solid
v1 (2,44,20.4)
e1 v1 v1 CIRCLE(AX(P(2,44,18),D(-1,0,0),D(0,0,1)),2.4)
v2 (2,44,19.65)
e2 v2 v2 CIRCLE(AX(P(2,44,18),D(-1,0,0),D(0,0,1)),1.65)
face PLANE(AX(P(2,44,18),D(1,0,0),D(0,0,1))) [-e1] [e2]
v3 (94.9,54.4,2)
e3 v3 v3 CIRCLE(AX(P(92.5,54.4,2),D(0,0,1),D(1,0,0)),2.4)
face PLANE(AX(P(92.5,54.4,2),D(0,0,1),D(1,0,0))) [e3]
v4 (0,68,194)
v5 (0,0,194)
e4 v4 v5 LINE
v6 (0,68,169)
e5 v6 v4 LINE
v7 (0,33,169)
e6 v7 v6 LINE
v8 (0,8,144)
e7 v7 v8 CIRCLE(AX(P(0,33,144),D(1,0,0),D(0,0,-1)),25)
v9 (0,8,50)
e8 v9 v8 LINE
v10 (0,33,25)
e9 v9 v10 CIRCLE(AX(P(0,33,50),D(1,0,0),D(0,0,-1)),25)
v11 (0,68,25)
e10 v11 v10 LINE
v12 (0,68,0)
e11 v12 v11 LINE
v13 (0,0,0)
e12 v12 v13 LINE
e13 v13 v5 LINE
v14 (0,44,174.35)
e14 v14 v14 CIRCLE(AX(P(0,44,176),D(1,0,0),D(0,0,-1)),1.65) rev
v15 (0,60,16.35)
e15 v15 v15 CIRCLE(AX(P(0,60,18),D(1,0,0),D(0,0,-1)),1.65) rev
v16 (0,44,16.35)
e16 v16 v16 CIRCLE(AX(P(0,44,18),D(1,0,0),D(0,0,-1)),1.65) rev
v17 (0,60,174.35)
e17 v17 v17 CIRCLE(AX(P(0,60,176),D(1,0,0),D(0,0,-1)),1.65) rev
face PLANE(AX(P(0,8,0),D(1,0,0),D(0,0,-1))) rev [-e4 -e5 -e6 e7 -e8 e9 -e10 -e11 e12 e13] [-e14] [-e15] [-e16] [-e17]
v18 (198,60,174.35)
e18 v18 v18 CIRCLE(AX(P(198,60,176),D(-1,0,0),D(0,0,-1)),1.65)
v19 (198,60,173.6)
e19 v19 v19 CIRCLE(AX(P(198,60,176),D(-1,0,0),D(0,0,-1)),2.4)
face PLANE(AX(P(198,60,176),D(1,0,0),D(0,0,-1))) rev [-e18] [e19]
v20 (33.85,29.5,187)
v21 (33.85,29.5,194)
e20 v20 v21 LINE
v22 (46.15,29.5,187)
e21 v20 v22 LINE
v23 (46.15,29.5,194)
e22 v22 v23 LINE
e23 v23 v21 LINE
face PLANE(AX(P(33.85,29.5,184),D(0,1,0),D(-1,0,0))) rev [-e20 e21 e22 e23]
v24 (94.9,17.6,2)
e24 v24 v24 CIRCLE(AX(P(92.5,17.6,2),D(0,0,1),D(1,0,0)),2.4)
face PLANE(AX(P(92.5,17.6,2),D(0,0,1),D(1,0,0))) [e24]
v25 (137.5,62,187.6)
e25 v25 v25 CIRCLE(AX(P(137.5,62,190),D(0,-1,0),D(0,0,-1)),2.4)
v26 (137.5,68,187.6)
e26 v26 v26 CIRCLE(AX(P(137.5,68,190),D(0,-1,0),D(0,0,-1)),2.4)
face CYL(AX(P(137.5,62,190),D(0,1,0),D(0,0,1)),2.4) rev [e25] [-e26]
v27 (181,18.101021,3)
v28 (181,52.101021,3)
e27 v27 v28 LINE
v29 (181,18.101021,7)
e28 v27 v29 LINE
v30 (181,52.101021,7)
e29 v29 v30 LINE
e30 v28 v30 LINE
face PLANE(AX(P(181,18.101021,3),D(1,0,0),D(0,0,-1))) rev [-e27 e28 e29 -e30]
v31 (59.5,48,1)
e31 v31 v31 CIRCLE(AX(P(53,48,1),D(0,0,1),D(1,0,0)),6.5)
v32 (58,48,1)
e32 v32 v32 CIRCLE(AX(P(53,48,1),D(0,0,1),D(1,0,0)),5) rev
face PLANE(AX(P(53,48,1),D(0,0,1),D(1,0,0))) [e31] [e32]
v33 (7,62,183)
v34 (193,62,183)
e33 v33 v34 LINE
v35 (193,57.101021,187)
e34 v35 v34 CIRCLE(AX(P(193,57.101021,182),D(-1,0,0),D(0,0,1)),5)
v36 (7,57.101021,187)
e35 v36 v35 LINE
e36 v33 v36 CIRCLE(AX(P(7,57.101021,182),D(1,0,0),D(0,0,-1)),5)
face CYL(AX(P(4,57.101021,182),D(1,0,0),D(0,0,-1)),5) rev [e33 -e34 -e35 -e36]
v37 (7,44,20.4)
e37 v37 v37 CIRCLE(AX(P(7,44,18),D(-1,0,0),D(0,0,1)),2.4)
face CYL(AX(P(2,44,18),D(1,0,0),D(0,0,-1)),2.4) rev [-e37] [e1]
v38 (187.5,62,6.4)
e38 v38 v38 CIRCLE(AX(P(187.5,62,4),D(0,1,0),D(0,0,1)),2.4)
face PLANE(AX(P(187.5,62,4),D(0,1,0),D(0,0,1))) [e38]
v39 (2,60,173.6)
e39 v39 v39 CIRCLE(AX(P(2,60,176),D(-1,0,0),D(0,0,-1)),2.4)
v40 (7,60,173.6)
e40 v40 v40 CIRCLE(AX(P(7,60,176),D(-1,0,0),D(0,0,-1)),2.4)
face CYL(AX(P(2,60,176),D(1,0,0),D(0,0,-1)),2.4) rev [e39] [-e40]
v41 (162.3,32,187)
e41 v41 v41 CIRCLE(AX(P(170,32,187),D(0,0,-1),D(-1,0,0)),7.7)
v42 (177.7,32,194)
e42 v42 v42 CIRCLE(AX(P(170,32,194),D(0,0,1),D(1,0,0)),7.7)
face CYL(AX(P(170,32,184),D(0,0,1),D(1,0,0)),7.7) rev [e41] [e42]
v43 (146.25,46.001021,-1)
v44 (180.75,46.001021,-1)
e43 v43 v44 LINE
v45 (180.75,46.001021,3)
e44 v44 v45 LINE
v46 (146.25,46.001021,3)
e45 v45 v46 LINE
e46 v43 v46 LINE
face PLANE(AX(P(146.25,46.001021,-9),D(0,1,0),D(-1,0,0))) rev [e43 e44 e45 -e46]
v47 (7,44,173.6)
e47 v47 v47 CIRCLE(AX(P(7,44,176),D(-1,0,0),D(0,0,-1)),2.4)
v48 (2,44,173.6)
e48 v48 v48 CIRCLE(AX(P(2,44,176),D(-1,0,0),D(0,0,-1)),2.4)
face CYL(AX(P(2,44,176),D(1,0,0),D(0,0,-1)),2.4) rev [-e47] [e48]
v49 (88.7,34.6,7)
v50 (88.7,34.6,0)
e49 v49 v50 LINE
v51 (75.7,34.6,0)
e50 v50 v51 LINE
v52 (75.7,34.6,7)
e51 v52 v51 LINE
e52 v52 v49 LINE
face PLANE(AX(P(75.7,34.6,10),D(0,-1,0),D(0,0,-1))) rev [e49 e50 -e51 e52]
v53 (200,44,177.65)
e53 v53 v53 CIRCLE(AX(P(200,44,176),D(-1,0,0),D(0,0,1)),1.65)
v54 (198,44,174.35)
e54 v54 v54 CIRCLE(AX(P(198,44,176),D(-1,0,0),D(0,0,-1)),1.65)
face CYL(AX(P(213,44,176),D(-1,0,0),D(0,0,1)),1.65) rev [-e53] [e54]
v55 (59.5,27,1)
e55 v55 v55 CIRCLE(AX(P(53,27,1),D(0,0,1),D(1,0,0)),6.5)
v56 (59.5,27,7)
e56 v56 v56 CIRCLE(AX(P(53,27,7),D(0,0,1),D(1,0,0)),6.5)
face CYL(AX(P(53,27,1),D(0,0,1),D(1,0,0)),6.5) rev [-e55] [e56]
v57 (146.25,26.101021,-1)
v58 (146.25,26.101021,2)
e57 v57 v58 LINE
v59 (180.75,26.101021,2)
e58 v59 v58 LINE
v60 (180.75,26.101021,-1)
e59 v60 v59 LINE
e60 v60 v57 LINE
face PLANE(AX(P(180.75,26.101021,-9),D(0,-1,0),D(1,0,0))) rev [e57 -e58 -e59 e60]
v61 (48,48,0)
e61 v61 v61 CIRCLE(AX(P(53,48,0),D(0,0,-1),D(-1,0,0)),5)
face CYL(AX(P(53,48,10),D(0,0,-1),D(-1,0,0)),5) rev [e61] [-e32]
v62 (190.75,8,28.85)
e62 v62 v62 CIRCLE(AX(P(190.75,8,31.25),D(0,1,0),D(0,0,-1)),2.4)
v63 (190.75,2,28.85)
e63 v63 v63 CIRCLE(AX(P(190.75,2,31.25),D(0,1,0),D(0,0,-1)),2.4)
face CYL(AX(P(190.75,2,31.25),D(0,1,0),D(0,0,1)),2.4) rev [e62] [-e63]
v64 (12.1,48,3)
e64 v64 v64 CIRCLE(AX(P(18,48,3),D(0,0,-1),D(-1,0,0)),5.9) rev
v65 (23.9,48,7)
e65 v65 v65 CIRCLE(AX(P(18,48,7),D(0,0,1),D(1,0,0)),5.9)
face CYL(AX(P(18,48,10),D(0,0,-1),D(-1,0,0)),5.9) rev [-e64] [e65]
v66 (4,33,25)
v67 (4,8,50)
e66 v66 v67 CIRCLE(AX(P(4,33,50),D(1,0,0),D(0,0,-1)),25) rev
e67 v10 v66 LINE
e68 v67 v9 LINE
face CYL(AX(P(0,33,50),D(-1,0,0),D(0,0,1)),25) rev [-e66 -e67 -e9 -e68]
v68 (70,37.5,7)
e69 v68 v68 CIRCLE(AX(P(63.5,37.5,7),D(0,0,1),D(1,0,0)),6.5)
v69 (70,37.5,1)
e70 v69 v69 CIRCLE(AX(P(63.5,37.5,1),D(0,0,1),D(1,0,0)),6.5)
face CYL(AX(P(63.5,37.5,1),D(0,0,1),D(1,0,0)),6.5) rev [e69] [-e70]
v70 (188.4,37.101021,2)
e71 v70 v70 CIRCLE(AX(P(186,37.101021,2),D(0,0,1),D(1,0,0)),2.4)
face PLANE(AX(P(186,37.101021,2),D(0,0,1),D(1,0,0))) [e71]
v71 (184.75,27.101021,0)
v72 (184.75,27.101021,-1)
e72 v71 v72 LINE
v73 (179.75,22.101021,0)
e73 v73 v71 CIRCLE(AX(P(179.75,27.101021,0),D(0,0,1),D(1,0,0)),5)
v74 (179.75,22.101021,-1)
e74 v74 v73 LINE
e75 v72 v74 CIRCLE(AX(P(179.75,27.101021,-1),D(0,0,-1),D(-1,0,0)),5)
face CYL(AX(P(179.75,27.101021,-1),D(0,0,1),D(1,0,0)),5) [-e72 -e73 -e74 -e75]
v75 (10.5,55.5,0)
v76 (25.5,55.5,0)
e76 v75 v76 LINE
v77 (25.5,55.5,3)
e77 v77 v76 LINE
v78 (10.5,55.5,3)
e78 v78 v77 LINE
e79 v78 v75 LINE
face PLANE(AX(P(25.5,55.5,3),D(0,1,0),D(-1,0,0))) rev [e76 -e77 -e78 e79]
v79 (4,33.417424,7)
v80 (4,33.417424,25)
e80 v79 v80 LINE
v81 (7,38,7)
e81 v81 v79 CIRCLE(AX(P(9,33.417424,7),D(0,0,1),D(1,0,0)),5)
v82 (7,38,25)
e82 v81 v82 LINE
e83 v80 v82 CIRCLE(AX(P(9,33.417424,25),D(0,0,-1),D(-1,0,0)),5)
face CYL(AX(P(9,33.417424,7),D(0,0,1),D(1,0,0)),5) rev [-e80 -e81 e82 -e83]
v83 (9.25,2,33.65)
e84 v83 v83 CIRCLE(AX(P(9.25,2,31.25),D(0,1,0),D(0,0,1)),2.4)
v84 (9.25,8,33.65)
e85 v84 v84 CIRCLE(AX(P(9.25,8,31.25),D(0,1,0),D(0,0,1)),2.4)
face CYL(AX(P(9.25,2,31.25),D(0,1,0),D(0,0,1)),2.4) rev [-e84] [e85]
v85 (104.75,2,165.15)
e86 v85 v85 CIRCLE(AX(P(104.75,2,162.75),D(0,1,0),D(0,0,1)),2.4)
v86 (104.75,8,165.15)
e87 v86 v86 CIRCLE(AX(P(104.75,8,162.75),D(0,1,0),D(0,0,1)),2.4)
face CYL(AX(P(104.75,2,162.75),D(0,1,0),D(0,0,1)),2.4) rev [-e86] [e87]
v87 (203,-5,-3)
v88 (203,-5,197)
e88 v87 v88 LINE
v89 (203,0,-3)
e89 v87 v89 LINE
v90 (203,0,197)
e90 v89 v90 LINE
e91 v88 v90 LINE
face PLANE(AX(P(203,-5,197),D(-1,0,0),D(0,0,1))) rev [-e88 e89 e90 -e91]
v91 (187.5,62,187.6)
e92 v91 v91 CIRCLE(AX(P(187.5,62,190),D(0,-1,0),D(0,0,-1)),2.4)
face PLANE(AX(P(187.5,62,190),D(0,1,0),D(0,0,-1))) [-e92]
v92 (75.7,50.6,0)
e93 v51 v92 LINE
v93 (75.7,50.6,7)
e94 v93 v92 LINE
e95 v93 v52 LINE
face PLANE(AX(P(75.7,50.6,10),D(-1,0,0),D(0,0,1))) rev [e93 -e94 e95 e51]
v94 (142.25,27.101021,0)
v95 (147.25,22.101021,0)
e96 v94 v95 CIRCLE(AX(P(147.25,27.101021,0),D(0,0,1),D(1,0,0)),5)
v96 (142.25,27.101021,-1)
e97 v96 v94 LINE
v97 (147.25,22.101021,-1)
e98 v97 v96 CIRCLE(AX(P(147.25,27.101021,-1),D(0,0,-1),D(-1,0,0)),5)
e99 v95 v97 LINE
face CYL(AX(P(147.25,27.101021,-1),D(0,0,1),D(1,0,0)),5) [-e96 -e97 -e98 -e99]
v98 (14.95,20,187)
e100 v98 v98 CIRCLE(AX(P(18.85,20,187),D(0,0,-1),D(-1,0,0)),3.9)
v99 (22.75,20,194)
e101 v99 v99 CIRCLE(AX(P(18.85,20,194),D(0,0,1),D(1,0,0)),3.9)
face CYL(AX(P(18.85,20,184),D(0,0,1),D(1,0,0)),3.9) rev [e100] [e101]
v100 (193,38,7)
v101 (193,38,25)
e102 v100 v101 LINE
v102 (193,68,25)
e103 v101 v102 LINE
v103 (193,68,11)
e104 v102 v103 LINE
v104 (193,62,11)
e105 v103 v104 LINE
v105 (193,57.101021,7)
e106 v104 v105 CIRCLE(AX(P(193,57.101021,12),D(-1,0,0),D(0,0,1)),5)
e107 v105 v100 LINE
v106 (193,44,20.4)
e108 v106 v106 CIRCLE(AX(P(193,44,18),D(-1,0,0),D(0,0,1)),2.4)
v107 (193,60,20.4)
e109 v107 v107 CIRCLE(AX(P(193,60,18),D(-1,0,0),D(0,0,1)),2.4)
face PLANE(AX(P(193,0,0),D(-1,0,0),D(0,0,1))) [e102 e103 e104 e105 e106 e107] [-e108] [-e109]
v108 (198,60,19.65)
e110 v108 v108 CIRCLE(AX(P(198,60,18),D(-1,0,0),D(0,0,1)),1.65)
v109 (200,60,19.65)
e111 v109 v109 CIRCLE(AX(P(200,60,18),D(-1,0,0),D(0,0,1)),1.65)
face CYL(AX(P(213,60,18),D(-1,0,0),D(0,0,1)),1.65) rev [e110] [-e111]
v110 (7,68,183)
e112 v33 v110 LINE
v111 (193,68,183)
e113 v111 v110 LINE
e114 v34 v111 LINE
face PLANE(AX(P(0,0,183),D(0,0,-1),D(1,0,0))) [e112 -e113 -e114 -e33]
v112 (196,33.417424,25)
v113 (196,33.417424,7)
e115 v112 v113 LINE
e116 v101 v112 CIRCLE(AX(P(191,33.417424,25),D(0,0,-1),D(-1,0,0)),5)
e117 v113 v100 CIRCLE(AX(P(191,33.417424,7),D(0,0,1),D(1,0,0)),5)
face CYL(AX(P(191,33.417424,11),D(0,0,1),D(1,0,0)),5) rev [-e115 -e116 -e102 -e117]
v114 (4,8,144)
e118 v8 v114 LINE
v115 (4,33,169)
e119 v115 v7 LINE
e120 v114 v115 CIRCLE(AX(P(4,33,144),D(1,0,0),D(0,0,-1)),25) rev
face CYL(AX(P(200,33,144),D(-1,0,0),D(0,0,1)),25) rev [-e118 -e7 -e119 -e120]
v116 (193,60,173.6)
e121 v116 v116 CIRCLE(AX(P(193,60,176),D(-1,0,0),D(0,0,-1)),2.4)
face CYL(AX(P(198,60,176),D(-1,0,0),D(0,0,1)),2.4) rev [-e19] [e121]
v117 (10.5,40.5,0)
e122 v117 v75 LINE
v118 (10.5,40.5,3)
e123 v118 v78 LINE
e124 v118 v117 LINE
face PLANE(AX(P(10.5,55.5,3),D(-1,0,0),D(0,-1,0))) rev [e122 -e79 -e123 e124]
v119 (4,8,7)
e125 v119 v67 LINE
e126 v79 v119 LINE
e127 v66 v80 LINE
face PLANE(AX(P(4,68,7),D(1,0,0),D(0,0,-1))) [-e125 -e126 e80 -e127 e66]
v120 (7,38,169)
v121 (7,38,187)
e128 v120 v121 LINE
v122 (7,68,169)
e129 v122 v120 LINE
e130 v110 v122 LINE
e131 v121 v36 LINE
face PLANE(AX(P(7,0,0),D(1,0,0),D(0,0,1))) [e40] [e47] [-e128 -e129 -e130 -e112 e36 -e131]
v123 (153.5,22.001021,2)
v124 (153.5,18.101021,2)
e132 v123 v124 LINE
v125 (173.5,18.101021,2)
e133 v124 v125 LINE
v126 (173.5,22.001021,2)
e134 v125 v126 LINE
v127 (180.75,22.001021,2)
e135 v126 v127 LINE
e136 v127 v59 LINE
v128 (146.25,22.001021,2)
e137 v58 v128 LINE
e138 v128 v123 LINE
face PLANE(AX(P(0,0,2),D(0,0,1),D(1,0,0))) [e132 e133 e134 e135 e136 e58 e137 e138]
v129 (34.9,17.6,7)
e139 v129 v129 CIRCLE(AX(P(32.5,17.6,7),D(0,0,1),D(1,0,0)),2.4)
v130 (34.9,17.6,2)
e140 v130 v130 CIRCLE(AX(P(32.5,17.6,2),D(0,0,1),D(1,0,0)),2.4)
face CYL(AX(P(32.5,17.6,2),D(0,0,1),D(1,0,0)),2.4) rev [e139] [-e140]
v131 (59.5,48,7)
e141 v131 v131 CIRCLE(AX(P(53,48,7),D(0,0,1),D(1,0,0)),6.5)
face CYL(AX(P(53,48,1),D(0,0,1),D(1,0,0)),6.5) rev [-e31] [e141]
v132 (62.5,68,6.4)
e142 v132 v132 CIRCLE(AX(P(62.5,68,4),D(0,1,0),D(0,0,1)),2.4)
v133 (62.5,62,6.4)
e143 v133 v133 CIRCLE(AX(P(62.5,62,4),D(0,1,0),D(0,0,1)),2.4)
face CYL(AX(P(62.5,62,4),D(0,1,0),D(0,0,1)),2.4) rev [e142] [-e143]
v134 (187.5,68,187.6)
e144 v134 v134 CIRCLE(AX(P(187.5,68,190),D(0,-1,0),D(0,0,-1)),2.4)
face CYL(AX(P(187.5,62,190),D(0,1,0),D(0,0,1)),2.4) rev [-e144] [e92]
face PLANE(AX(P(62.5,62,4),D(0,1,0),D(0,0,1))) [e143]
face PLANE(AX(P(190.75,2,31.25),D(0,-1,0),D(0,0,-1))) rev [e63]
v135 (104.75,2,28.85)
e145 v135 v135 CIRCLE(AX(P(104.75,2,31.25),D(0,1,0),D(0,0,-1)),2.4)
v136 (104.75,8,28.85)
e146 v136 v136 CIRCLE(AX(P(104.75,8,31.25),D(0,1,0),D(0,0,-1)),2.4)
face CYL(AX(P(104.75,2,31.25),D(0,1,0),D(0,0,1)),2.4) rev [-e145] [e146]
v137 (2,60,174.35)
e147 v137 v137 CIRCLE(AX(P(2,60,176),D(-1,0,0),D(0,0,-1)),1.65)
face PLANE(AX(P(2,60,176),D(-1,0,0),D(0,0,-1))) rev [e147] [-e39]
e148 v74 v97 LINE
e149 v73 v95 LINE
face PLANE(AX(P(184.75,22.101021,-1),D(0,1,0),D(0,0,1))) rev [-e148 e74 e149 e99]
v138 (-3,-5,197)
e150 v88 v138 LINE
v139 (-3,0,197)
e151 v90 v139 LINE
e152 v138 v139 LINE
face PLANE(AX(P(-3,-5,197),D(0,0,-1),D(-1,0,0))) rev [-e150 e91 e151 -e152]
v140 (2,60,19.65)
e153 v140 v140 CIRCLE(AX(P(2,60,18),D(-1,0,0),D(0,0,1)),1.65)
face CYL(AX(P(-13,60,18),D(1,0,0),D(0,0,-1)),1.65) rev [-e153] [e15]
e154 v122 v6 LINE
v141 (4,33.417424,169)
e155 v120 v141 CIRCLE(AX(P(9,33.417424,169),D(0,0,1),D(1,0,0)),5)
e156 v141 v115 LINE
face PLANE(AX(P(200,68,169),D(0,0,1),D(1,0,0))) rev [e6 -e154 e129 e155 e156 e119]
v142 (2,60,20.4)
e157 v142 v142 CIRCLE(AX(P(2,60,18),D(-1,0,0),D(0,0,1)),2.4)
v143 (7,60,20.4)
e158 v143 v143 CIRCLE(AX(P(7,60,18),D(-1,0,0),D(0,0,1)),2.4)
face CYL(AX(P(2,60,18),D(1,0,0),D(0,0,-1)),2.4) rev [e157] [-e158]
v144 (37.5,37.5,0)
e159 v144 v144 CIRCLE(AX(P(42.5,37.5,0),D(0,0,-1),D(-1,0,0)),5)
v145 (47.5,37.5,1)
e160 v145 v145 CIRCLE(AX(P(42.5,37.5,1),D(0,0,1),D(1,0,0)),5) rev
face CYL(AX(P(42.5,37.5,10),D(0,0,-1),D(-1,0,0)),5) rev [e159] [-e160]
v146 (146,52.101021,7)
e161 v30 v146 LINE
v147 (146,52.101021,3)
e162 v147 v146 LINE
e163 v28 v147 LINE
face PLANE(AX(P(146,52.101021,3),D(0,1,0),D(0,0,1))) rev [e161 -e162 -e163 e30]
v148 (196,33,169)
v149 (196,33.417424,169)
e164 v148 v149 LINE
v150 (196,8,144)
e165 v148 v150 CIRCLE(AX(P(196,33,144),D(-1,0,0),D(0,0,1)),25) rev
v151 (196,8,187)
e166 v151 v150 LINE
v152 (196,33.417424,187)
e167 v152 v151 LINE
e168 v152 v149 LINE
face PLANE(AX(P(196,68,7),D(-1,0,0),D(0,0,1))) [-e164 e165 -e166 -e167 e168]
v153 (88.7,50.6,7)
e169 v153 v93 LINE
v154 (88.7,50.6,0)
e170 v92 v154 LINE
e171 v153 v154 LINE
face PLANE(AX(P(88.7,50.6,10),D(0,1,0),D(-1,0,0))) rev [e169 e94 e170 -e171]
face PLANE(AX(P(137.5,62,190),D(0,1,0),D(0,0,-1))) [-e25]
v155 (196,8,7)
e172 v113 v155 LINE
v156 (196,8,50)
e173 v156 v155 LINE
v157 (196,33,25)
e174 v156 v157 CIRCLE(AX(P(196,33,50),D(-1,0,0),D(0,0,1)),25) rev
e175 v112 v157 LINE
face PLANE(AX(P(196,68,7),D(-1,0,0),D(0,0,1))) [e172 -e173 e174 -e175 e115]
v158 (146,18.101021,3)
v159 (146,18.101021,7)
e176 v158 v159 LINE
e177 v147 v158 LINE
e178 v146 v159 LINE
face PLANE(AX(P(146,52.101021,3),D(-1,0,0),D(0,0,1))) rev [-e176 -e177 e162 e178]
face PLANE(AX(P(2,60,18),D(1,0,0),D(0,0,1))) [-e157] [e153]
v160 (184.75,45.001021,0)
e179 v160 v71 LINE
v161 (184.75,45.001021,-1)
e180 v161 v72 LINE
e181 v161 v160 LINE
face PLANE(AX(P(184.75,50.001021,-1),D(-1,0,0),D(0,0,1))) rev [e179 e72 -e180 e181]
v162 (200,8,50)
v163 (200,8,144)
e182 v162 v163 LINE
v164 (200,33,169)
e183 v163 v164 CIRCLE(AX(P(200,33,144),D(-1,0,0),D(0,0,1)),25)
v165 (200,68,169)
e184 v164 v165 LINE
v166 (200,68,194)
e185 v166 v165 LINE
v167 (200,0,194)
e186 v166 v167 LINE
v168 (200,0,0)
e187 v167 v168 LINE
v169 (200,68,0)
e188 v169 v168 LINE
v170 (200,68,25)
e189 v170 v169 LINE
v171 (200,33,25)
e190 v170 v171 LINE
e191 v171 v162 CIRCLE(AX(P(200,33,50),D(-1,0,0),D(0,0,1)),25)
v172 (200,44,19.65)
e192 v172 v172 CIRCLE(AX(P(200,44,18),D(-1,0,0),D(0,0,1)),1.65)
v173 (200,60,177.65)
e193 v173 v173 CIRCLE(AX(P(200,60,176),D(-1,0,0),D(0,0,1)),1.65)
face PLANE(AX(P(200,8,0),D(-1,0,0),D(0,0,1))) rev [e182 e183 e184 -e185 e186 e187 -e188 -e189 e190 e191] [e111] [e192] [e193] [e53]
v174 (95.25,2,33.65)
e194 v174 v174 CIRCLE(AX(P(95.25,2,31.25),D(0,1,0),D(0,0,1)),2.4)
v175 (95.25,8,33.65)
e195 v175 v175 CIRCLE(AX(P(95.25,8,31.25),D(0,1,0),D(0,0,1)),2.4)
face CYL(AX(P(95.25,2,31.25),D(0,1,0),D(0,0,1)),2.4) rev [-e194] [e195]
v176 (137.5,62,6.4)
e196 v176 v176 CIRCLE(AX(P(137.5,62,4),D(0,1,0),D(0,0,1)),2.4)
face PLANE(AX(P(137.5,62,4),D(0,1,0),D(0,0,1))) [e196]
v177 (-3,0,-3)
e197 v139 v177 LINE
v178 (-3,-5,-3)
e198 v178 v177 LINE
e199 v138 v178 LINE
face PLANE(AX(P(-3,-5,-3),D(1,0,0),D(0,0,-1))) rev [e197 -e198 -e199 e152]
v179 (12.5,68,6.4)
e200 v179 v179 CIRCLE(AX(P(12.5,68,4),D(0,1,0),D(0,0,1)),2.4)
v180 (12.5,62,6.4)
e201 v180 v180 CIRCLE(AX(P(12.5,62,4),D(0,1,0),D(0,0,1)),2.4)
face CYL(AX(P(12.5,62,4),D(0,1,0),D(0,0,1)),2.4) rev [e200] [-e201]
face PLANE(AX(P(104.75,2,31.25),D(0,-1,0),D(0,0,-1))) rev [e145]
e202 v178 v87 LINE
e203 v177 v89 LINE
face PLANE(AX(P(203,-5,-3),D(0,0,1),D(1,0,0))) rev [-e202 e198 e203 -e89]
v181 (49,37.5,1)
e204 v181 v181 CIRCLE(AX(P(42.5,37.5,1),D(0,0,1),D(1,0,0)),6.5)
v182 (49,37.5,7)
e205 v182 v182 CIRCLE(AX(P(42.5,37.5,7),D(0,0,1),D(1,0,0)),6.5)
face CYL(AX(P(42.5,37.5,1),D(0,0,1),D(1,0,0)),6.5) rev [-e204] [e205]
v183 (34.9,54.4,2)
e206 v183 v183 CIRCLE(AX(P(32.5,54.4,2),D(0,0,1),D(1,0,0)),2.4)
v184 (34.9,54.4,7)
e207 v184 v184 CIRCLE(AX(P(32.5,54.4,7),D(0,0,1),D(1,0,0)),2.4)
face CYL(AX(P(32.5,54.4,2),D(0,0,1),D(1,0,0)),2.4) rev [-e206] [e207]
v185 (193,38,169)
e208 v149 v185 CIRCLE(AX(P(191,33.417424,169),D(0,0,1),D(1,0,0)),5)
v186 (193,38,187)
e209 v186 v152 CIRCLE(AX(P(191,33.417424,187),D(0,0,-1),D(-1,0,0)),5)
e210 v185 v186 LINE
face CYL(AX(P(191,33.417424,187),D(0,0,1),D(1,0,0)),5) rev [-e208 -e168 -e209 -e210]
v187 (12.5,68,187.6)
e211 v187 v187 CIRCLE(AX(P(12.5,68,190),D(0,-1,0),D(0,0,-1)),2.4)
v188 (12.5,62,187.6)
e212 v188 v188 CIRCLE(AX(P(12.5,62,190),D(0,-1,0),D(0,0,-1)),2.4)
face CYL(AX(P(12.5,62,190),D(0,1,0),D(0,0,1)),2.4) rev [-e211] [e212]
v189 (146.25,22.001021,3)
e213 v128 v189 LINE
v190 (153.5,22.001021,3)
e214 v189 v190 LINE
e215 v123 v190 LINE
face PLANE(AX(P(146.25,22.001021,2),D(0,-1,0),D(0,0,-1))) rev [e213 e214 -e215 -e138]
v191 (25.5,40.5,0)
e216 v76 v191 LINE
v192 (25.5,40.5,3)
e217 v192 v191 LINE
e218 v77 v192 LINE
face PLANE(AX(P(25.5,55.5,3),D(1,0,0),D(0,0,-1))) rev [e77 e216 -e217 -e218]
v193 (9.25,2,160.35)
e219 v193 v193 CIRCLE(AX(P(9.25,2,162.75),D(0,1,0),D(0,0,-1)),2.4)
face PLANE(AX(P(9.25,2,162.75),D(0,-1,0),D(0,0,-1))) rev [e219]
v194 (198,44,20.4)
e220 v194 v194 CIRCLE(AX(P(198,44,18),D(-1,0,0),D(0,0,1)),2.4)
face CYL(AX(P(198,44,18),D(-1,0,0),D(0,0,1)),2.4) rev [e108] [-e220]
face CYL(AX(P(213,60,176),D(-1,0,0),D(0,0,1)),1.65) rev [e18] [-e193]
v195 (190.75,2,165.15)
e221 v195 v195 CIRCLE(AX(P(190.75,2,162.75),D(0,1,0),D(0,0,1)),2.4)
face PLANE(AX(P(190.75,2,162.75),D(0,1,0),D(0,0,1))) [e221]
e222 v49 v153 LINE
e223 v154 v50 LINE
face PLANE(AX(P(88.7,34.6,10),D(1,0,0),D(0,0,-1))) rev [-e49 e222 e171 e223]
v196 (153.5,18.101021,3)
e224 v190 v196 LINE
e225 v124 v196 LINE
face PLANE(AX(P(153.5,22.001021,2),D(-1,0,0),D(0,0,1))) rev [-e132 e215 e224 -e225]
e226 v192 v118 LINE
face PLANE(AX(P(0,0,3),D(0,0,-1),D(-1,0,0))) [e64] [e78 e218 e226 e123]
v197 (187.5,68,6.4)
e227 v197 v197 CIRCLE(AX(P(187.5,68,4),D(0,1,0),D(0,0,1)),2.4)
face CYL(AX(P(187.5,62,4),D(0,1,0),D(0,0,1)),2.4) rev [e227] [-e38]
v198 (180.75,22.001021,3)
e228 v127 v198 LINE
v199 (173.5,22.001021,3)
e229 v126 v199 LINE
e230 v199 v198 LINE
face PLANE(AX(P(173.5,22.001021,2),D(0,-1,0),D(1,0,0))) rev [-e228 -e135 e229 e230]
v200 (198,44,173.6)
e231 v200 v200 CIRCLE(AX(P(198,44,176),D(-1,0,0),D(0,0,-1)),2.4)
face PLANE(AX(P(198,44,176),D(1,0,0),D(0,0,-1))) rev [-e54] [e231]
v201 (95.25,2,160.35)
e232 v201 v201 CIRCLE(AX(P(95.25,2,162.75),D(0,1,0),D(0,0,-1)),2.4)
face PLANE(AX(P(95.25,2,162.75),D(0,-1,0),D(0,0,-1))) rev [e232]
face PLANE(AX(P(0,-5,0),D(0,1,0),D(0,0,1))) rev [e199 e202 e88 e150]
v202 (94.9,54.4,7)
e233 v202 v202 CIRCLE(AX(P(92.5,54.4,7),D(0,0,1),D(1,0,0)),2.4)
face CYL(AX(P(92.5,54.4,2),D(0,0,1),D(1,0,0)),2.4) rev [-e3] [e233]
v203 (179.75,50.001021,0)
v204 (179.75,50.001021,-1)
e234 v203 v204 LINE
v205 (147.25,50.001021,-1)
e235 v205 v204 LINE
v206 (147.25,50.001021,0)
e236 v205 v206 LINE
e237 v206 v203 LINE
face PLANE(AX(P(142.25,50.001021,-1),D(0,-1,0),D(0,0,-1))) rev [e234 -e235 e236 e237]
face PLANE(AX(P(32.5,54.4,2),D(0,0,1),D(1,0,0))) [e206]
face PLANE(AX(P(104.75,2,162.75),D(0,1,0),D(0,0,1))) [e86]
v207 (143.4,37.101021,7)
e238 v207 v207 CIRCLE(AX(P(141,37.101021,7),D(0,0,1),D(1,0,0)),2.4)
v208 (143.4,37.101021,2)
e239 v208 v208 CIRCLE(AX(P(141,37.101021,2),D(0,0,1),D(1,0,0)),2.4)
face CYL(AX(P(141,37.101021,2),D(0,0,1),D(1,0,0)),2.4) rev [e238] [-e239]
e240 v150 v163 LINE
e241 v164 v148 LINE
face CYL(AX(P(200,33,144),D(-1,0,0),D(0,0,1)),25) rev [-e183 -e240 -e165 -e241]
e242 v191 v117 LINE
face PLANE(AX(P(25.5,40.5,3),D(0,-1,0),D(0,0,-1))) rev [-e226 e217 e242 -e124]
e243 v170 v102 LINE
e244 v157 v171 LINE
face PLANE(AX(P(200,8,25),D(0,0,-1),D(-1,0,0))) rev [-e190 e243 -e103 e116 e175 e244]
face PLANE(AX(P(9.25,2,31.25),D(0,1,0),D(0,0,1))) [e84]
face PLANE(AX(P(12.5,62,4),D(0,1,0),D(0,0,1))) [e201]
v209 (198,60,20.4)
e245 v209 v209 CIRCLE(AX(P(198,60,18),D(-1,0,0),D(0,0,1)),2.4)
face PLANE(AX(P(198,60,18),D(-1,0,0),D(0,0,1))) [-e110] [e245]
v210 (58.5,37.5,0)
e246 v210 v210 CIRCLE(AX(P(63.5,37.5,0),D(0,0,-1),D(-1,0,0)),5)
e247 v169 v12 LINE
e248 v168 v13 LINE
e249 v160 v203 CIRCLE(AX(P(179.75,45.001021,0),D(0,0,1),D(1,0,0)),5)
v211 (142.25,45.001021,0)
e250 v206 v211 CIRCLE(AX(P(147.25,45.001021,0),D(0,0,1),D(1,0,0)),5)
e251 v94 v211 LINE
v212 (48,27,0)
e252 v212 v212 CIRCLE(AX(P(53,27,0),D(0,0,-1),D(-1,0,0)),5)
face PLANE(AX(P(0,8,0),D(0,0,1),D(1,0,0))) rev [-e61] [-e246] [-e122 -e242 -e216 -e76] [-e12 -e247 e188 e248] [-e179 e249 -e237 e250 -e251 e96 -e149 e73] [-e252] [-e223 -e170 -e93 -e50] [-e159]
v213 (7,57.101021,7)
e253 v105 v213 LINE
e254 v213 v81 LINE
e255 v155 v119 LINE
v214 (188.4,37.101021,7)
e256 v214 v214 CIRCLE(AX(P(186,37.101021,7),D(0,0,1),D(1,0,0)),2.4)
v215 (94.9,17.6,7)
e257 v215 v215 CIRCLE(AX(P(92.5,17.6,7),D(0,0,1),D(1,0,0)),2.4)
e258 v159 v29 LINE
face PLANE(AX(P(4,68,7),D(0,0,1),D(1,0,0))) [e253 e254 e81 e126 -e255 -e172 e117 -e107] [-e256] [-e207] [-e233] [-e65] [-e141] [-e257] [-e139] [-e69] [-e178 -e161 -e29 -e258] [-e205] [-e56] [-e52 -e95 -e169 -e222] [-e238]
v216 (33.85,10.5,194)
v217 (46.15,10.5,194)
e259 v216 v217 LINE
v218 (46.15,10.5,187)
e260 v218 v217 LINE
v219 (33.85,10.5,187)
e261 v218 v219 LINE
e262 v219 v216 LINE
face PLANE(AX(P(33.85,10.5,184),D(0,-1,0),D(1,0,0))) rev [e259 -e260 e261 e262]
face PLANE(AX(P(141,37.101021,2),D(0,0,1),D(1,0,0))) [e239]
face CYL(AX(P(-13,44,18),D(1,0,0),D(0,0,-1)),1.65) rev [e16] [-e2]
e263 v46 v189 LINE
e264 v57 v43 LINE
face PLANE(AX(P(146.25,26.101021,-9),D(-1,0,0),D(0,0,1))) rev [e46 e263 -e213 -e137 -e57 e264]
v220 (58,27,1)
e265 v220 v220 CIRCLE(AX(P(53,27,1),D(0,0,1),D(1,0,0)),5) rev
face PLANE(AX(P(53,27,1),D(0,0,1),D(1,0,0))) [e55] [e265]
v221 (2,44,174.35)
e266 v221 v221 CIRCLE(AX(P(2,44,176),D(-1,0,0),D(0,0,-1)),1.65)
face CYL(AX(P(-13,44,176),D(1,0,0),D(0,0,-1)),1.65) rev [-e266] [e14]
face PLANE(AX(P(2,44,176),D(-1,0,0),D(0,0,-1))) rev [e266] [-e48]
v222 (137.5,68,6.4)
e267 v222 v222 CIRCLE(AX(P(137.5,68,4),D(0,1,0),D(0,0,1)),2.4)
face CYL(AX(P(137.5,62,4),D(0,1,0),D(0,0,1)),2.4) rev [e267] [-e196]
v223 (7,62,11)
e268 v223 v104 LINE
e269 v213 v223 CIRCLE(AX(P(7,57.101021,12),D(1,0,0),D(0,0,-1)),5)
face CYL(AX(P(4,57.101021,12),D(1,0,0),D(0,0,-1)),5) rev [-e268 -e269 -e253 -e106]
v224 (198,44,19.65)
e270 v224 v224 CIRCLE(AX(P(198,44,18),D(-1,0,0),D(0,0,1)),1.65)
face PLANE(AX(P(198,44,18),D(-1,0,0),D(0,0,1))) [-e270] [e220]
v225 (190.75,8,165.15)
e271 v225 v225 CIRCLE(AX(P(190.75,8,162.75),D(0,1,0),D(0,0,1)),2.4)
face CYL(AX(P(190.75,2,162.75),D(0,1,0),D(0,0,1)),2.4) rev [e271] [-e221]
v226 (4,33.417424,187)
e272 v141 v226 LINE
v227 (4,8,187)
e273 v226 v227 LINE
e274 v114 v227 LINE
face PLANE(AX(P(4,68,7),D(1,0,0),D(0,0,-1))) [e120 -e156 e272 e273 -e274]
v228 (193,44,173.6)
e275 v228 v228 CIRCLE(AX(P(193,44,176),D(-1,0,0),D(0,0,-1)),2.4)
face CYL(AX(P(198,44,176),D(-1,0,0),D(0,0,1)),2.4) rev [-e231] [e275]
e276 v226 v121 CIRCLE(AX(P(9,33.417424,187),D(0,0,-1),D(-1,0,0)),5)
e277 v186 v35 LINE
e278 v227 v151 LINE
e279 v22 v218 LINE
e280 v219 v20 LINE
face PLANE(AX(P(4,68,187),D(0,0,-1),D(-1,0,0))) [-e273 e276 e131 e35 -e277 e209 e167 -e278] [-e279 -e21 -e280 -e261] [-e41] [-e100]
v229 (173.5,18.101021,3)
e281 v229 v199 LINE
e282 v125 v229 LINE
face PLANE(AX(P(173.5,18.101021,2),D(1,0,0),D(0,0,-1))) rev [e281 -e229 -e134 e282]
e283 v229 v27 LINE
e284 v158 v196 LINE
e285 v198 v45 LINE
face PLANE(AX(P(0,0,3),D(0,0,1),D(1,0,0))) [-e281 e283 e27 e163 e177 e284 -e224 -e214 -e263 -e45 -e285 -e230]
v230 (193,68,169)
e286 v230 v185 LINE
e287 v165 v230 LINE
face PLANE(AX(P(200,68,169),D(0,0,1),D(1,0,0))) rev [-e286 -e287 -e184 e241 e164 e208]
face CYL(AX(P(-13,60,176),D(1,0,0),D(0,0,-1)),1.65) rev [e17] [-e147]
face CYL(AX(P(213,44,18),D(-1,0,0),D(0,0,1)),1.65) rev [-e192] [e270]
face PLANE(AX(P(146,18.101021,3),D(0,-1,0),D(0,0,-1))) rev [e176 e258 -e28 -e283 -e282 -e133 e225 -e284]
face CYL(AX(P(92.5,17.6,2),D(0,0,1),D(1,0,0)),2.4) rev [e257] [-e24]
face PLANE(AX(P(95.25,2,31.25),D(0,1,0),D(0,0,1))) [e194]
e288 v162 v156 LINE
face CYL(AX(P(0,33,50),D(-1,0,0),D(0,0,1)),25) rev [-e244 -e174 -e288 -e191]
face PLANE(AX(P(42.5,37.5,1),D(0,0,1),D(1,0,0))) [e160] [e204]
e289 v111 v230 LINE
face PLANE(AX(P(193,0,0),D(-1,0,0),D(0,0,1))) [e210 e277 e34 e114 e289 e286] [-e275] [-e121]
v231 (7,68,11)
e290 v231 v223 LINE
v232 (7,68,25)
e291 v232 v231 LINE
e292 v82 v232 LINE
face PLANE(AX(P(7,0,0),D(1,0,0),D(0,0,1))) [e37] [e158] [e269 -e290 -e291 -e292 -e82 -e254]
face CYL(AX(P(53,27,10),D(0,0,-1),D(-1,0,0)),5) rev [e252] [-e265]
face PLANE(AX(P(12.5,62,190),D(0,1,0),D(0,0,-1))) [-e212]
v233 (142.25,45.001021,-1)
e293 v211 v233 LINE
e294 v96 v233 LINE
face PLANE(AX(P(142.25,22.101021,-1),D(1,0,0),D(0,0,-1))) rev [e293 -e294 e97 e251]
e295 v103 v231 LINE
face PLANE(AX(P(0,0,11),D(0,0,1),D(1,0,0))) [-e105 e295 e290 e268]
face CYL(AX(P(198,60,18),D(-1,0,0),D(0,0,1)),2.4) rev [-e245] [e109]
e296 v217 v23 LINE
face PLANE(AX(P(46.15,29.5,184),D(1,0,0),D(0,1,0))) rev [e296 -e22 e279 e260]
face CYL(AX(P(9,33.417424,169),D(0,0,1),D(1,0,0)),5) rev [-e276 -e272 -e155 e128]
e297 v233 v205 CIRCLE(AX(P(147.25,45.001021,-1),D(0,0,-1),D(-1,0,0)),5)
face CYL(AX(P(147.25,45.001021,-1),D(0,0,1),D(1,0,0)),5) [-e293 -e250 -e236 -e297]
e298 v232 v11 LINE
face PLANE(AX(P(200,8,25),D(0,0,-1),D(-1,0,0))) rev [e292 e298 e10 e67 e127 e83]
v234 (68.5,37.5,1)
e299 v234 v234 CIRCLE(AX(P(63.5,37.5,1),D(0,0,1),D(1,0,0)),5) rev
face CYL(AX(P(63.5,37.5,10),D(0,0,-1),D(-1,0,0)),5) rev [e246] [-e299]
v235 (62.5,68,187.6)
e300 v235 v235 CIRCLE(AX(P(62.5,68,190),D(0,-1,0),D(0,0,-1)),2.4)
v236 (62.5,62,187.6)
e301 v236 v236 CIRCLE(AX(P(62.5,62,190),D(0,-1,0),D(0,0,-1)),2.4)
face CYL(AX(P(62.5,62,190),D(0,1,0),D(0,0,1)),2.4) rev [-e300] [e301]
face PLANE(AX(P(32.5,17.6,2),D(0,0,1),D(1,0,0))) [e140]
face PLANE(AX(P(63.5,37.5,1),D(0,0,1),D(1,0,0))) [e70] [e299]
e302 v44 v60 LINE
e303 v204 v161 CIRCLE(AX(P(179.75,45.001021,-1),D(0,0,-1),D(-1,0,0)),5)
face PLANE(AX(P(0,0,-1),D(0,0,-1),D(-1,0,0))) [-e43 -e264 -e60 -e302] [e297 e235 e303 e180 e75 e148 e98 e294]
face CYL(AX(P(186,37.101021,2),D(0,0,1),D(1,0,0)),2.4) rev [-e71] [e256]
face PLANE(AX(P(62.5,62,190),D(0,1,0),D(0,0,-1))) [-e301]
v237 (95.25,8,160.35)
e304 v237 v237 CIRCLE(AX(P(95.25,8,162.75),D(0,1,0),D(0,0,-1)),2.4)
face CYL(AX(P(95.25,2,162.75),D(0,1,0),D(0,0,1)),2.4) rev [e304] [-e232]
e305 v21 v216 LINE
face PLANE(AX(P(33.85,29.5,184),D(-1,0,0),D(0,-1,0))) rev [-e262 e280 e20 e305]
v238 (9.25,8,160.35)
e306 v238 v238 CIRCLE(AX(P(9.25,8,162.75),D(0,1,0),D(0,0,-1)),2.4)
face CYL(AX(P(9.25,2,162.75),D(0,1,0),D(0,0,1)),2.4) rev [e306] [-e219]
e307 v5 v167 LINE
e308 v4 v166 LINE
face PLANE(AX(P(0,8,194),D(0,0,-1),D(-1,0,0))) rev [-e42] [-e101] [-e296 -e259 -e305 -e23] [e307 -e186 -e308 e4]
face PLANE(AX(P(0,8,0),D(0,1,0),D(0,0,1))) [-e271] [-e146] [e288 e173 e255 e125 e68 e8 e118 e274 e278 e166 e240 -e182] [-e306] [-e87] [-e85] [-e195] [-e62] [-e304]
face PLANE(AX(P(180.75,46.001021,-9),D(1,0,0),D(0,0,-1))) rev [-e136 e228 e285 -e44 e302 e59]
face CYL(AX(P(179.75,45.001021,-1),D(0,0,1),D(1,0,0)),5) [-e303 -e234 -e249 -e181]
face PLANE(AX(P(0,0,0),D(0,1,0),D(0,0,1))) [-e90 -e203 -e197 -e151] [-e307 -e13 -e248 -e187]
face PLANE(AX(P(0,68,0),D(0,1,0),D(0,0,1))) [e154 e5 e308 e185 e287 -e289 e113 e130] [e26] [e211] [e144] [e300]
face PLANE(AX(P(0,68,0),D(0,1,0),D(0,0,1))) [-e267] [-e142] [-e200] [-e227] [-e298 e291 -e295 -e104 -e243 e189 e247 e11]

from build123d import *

# Parameters (mm, degrees)
SKETCH1_W           = 200
SKETCH1_H           = 194
BOSS_EXTRUDE1_DEPTH = 8
SKETCH4_R           = 2.4
CUT_EXTRUDE1_DEPTH  = 6
SKETCH5_W           = 200
SKETCH5_H           = 194
SKETCH5_W_2         = 192
SKETCH5_H_2         = 180
BOSS_EXTRUDE4_DEPTH = 60
SKETCH6_W           = 192
SKETCH6_H           = 6
BOSS_EXTRUDE5_DEPTH = 4
SKETCH7_R           = 2.4
CUT_EXTRUDE2_DEPTH  = 6
SKETCH10_R          = 3.9
SKETCH10_R_2        = 7.7
SKETCH10_W          = 12.3
SKETCH10_H          = 19
CUT_EXTRUDE4_DEPTH  = 10
SKETCH16_R          = 5
SKETCH16_R_2        = 5.9
SKETCH16_W          = 13
SKETCH16_H          = 16
CUT_EXTRUDE5_DEPTH  = 10
SKETCH17_W          = 15
SKETCH17_H          = 15
CUT_EXTRUDE6_DEPTH  = 3
SKETCH19_R          = 2.4
CUT_EXTRUDE7_DEPTH  = 5
SKETCH20_R          = 6.5
CUT_EXTRUDE8_DEPTH  = 6
SKETCH22_W          = 35
SKETCH22_H          = 34
CUT_EXTRUDE9_DEPTH  = 4
SKETCH23_W          = 34.5
SKETCH23_H          = 19.9
CUT_EXTRUDE10_DEPTH = 12
CUT_EXTRUDE11_DEPTH = 1
SKETCH25_R          = 2.4
CUT_EXTRUDE12_DEPTH = 5
SKETCH26_W          = 144
SKETCH26_H          = 60
CUT_EXTRUDE13_DEPTH = 287.810041665
SKETCH27_W          = 42.5
SKETCH27_H          = 27.9
SKETCH27_W_2        = 34.5
SKETCH27_H_2        = 19.9
BOSS_EXTRUDE7_DEPTH = 1
FILLET5_R           = 5
BOSS_EXTRUDE8_DEPTH = 3
FILLET6_R           = 5
SKETCH30_R          = 2.4
CUT_EXTRUDE14_DEPTH = 5
SKETCH32_R          = 1.65
CUT_EXTRUDE15_DEPTH = 15
FILLET7_R           = 5
FILLET8_R           = 5
FILLET9_R           = 5
FILLET10_R          = 25
SKETCH33_W          = 206
SKETCH33_H          = 200
BOSS_EXTRUDE9_DEPTH = 5


with BuildPart() as part:
    # Sketch1 → Boss-Extrude1 (new body)
    with BuildSketch(Plane(origin=(0, 0, 0), x_dir=(1, 0, 0), z_dir=(0, 1, 0))):
        with Locations((100, -97)):
            Rectangle(SKETCH1_W, SKETCH1_H)
    extrude(amount=BOSS_EXTRUDE1_DEPTH)

    # Sketch4 → Cut-Extrude1 (cut)
    with BuildSketch(Plane(origin=(0, 8, 0), x_dir=(1, 0, 0), z_dir=(0, 1, 0))):
        with Locations(Location((9.25, -31.25, 0), (0, 0, 270))):
            Circle(SKETCH4_R)
        with Locations(Location((95.25, -31.25, 0), (0, 0, 270))):
            Circle(SKETCH4_R)
        with Locations(Location((95.25, -162.75, 0), (0, 0, 90))):
            Circle(SKETCH4_R)
        with Locations(Location((9.25, -162.75, 0), (0, 0, 90))):
            Circle(SKETCH4_R)
        with Locations(Location((190.75, -162.75, 0), (0, 0, 270))):
            Circle(SKETCH4_R)
        with Locations(Location((104.75, -162.75, 0), (0, 0, 270))):
            Circle(SKETCH4_R)
        with Locations(Location((104.75, -31.25, 0), (0, 0, 90))):
            Circle(SKETCH4_R)
        with Locations(Location((190.75, -31.25, 0), (0, 0, 90))):
            Circle(SKETCH4_R)
    extrude(amount=-CUT_EXTRUDE1_DEPTH, mode=Mode.SUBTRACT)

    # Sketch5 → Boss-Extrude4 (add)
    with BuildSketch(Plane(origin=(0, 8, 0), x_dir=(1, 0, 0), z_dir=(0, 1, 0))):
        with Locations((100, -97)):
            Rectangle(SKETCH5_W, SKETCH5_H)
        with Locations((100, -97)):
            Rectangle(SKETCH5_W_2, SKETCH5_H_2, mode=Mode.SUBTRACT)
    extrude(amount=BOSS_EXTRUDE4_DEPTH)

    # Sketch6 → Boss-Extrude5 (add)
    with BuildSketch(Plane.XY.offset(7)):
        with Locations((100, 65)):
            Rectangle(SKETCH6_W, SKETCH6_H)
    boss_extrude5 = extrude(amount=BOSS_EXTRUDE5_DEPTH)

    # Sketch7 → Cut-Extrude2 (cut)
    with BuildSketch(Plane(origin=(0, 68, 0), x_dir=(1, 0, 0), z_dir=(0, 1, 0))):
        with Locations(Location((12.5, -4, 0), (0, 0, 270))):
            Circle(SKETCH7_R)
        with Locations(Location((62.5, -4, 0), (0, 0, 270))):
            Circle(SKETCH7_R)
        with Locations(Location((187.5, -4, 0), (0, 0, 270))):
            Circle(SKETCH7_R)
        with Locations(Location((137.5, -4, 0), (0, 0, 270))):
            Circle(SKETCH7_R)
    cut_extrude2 = extrude(amount=-CUT_EXTRUDE2_DEPTH, mode=Mode.SUBTRACT)

    # Mirror3: Boss-Extrude5 across plane
    add(boss_extrude5.mirror(Plane.XY.offset(97)))

    # Mirror5: Cut-Extrude2 across plane
    add(cut_extrude2.mirror(Plane.XY.offset(97)), mode=Mode.SUBTRACT)

    # Sketch10 → Cut-Extrude4 (cut)
    with BuildSketch(Plane.XY.offset(194)):
        with Locations((18.85, 20)):
            Circle(SKETCH10_R)
        with Locations((170, 32)):
            Circle(SKETCH10_R_2)
        with Locations((40, 20)):
            Rectangle(SKETCH10_W, SKETCH10_H)
    extrude(amount=-CUT_EXTRUDE4_DEPTH, mode=Mode.SUBTRACT)

    # Sketch16 → Cut-Extrude5 (cut)
    with BuildSketch(Plane(origin=(0, 0, 0), x_dir=(-1, 0, 0), z_dir=(0, 0, -1))):
        with Locations((-53, 48)):
            Circle(SKETCH16_R)
        with Locations((-63.5, 37.5)):
            Circle(SKETCH16_R)
        with Locations((-42.5, 37.5)):
            Circle(SKETCH16_R)
        with Locations((-53, 27)):
            Circle(SKETCH16_R)
        with Locations((-18, 48)):
            Circle(SKETCH16_R_2)
        with Locations((-82.2, 42.6)):
            Rectangle(SKETCH16_W, SKETCH16_H)
    extrude(amount=-CUT_EXTRUDE5_DEPTH, mode=Mode.SUBTRACT)

    # Sketch17 → Cut-Extrude6 (cut)
    with BuildSketch(Plane(origin=(0, 0, 0), x_dir=(-1, 0, 0), z_dir=(0, 0, -1))):
        with Locations((-18, 48)):
            Rectangle(SKETCH17_W, SKETCH17_H)
    extrude(amount=-CUT_EXTRUDE6_DEPTH, mode=Mode.SUBTRACT)

    # Sketch19 → Cut-Extrude7 (cut)
    with BuildSketch(Plane.XY.offset(7)):
        with Locations((32.5, 54.4)):
            Circle(SKETCH19_R)
        with Locations((92.5, 54.4)):
            Circle(SKETCH19_R)
        with Locations((92.5, 17.6)):
            Circle(SKETCH19_R)
        with Locations((32.5, 17.6)):
            Circle(SKETCH19_R)
    extrude(amount=-CUT_EXTRUDE7_DEPTH, mode=Mode.SUBTRACT)

    # Sketch20 → Cut-Extrude8 (cut)
    with BuildSketch(Plane.XY.offset(7)):
        with Locations((53, 48)):
            Circle(SKETCH20_R)
        with Locations((42.5, 37.5)):
            Circle(SKETCH20_R)
        with Locations((53, 27)):
            Circle(SKETCH20_R)
        with Locations((63.5, 37.5)):
            Circle(SKETCH20_R)
    extrude(amount=-CUT_EXTRUDE8_DEPTH, mode=Mode.SUBTRACT)

    # Sketch22 → Cut-Extrude9 (cut)
    with BuildSketch(Plane.XY.offset(7)):
        with Locations((163.5, 35.101020514)):
            Rectangle(SKETCH22_W, SKETCH22_H)
    extrude(amount=-CUT_EXTRUDE9_DEPTH, mode=Mode.SUBTRACT)

    # Sketch23 → Cut-Extrude10 (cut)
    with BuildSketch(Plane.XY.offset(3)):
        with Locations((163.5, 36.051020514)):
            Rectangle(SKETCH23_W, SKETCH23_H)
    extrude(amount=-CUT_EXTRUDE10_DEPTH, mode=Mode.SUBTRACT)

    # Sketch24 → Cut-Extrude11 (cut)
    with BuildSketch(Plane.XY.offset(3)):
        Polygon((146.25, 26.101020514), (146.25, 22.001020514), (153.5, 22.001020514), (153.5, 18.101020514), (173.5, 18.101020514), (173.5, 22.001020514), (180.75, 22.001020514), (180.75, 26.101020514), align=None)
    extrude(amount=-CUT_EXTRUDE11_DEPTH, mode=Mode.SUBTRACT)

    # Sketch25 → Cut-Extrude12 (cut)
    with BuildSketch(Plane.XY.offset(7)):
        with Locations((141, 37.101020514)):
            Circle(SKETCH25_R)
        with Locations((186, 37.101020514)):
            Circle(SKETCH25_R)
    extrude(amount=-CUT_EXTRUDE12_DEPTH, mode=Mode.SUBTRACT)

    # Sketch26 → Cut-Extrude13 (cut, through all)
    with BuildSketch(Plane.ZY):
        with Locations((97, 38)):
            Rectangle(SKETCH26_W, SKETCH26_H)
    extrude(amount=-CUT_EXTRUDE13_DEPTH, mode=Mode.SUBTRACT)

    # Sketch27 → Boss-Extrude7 (add)
    with BuildSketch(Plane(origin=(0, 0, 0), x_dir=(-1, 0, 0), z_dir=(0, 0, -1))):
        with Locations((-163.5, 36.051020514)):
            Rectangle(SKETCH27_W, SKETCH27_H)
        with Locations((-163.5, 36.051020514)):
            Rectangle(SKETCH27_W_2, SKETCH27_H_2, mode=Mode.SUBTRACT)
    extrude(amount=BOSS_EXTRUDE7_DEPTH)

    # Fillet5
    fillet5_edges = [part.edges().sort_by_distance(p)[0] for p in [
        (184.75, 50.001020514, -0.5),
        (184.75, 22.101020514, -0.5),
        (142.25, 22.101020514, -0.5),
        (142.25, 50.001020514, -0.5),
    ]]
    fillet(fillet5_edges, radius=FILLET5_R)

    # Sketch28 → Boss-Extrude8 (add)
    with BuildSketch(Plane.ZY.offset(-196)):
        Polygon((25, 68), (11, 68), (11, 62), (7, 62), (7, 38), (11, 38), (25, 38), align=None)
        Polygon((183, 68), (169, 68), (169, 38), (183, 38), (187, 38), (187, 62), (183, 62), align=None)
    boss_extrude8 = extrude(amount=BOSS_EXTRUDE8_DEPTH)

    # Fillet6
    # the kernel refuses this fillet: 5 mm, written as the material it adds along each edge
    with BuildSketch(Plane(origin=(196, 38, 169), x_dir=(-1, 0, 0), z_dir=(0, 0, 1)), Plane(origin=(196, 38, 7), x_dir=(-1, 0, 0), z_dir=(0, 0, 1))) as fillet6_piece_1:
        with BuildLine():
            CenterArc((5, 4.582575695), FILLET6_R, 180, 66.421821522)
            Line((0, 4.582575695), (0, 0))
            Line((0, 0), (3, 0))
        make_face()
    extrude(amount=18)

    # Sketch30 → Cut-Extrude14 (cut)
    with BuildSketch(Plane.ZY.offset(-193)):
        with Locations((18, 60)):
            Circle(SKETCH30_R)
        with Locations((18, 44)):
            Circle(SKETCH30_R)
        with Locations(Location((176, 44, 0), (0, 0, 180))):
            Circle(SKETCH30_R)
        with Locations(Location((176, 60, 0), (0, 0, 180))):
            Circle(SKETCH30_R)
    cut_extrude14 = extrude(amount=-CUT_EXTRUDE14_DEPTH, mode=Mode.SUBTRACT)

    # Sketch32 → Cut-Extrude15 (cut)
    with BuildSketch(Plane.ZY.offset(-198)):
        with Locations((18, 60)):
            Circle(SKETCH32_R)
        with Locations((18, 44)):
            Circle(SKETCH32_R)
        with Locations((176, 44)):
            Circle(SKETCH32_R)
        with Locations((176, 60)):
            Circle(SKETCH32_R)
    cut_extrude15 = extrude(amount=-CUT_EXTRUDE15_DEPTH, mode=Mode.SUBTRACT)

    # Mirror8: Boss-Extrude8, Cut-Extrude14, Cut-Extrude15 across plane
    add(boss_extrude8.mirror(Plane(origin=(100, 0, 0), x_dir=(0, 0, 1), z_dir=(1, 0, 0))))
    add(cut_extrude14.mirror(Plane(origin=(100, 0, 0), x_dir=(0, 0, 1), z_dir=(1, 0, 0))), mode=Mode.SUBTRACT)
    add(cut_extrude15.mirror(Plane(origin=(100, 0, 0), x_dir=(0, 0, 1), z_dir=(1, 0, 0))), mode=Mode.SUBTRACT)

    # Fillet7
    # the kernel refuses this fillet: 5 mm, written as the material it adds along each edge
    with BuildSketch(Plane(origin=(4, 38, 169), x_dir=(0, -1, 0), z_dir=(0, 0, 1))) as fillet7_piece_1_section:
        with BuildLine():
            CenterArc((4.582575695, 5), FILLET7_R, 203.578178478, 66.421821522)
            Line((0, 3), (0, 0))
            Line((0, 0), (4.582575695, 0))
        make_face()
    fillet7_piece_1 = extrude(amount=29.456439237, mode=Mode.PRIVATE)
    fillet7_piece_1 = split(fillet7_piece_1, bisect_by=Plane(origin=(4.808333267, 36.161514318, 194), z_dir=(0, 0, -1)), keep=Keep.TOP, mode=Mode.PRIVATE)
    add(fillet7_piece_1)
    with BuildSketch(Plane(origin=(4, 38, -4.456439237), x_dir=(0, -1, 0), z_dir=(0, 0, 1))) as fillet7_piece_2_section:
        with BuildLine():
            CenterArc((4.582575695, 5), FILLET7_R, 203.578178478, 66.421821522)
            Line((0, 3), (0, 0))
            Line((0, 0), (4.582575695, 0))
        make_face()
    fillet7_piece_2 = extrude(amount=29.456439237, mode=Mode.PRIVATE)
    fillet7_piece_2 = split(fillet7_piece_2, bisect_by=Plane(origin=(4.808333267, 36.161514318, 0), z_dir=(0, 0, 1)), keep=Keep.TOP, mode=Mode.PRIVATE)
    add(fillet7_piece_2)

    # Fillet8
    # the kernel refuses this fillet: 5 mm, written as the material it adds along each edge
    with BuildSketch(Plane(origin=(7, 62, 7), x_dir=(0, -1, 0), z_dir=(1, 0, 0))) as fillet8_piece_1:
        with BuildLine():
            CenterArc((4.898979486, -5), FILLET8_R, 90, 78.463040967)
            Line((0, -4), (0, 0))
            Line((0, 0), (4.898979486, 0))
        make_face()
    extrude(amount=186)

    # Fillet9
    # the kernel refuses this fillet: 5 mm, written as the material it adds along each edge
    with BuildSketch(Plane(origin=(7, 62, 187), x_dir=(0, -1, 0), z_dir=(1, 0, 0))) as fillet9_piece_1:
        with BuildLine():
            CenterArc((4.898979486, 5), FILLET9_R, 191.536959033, 78.463040967)
            Line((0, 4), (0, 0))
            Line((0, 0), (4.898979486, 0))
        make_face()
    extrude(amount=186)

    # Fillet10
    fillet10_edges = [part.edges().sort_by_distance(p)[0] for p in [
        (198, 8, 25),
        (198, 8, 169),
        (2, 8, 169),
        (2, 8, 25),
    ]]
    fillet(fillet10_edges, radius=FILLET10_R)

    # Sketch33 → Boss-Extrude9 (add)
    with BuildSketch(Plane.XZ):
        with Locations((100, 97)):
            Rectangle(SKETCH33_W, SKETCH33_H)
    extrude(amount=BOSS_EXTRUDE9_DEPTH)


solid = part.part
